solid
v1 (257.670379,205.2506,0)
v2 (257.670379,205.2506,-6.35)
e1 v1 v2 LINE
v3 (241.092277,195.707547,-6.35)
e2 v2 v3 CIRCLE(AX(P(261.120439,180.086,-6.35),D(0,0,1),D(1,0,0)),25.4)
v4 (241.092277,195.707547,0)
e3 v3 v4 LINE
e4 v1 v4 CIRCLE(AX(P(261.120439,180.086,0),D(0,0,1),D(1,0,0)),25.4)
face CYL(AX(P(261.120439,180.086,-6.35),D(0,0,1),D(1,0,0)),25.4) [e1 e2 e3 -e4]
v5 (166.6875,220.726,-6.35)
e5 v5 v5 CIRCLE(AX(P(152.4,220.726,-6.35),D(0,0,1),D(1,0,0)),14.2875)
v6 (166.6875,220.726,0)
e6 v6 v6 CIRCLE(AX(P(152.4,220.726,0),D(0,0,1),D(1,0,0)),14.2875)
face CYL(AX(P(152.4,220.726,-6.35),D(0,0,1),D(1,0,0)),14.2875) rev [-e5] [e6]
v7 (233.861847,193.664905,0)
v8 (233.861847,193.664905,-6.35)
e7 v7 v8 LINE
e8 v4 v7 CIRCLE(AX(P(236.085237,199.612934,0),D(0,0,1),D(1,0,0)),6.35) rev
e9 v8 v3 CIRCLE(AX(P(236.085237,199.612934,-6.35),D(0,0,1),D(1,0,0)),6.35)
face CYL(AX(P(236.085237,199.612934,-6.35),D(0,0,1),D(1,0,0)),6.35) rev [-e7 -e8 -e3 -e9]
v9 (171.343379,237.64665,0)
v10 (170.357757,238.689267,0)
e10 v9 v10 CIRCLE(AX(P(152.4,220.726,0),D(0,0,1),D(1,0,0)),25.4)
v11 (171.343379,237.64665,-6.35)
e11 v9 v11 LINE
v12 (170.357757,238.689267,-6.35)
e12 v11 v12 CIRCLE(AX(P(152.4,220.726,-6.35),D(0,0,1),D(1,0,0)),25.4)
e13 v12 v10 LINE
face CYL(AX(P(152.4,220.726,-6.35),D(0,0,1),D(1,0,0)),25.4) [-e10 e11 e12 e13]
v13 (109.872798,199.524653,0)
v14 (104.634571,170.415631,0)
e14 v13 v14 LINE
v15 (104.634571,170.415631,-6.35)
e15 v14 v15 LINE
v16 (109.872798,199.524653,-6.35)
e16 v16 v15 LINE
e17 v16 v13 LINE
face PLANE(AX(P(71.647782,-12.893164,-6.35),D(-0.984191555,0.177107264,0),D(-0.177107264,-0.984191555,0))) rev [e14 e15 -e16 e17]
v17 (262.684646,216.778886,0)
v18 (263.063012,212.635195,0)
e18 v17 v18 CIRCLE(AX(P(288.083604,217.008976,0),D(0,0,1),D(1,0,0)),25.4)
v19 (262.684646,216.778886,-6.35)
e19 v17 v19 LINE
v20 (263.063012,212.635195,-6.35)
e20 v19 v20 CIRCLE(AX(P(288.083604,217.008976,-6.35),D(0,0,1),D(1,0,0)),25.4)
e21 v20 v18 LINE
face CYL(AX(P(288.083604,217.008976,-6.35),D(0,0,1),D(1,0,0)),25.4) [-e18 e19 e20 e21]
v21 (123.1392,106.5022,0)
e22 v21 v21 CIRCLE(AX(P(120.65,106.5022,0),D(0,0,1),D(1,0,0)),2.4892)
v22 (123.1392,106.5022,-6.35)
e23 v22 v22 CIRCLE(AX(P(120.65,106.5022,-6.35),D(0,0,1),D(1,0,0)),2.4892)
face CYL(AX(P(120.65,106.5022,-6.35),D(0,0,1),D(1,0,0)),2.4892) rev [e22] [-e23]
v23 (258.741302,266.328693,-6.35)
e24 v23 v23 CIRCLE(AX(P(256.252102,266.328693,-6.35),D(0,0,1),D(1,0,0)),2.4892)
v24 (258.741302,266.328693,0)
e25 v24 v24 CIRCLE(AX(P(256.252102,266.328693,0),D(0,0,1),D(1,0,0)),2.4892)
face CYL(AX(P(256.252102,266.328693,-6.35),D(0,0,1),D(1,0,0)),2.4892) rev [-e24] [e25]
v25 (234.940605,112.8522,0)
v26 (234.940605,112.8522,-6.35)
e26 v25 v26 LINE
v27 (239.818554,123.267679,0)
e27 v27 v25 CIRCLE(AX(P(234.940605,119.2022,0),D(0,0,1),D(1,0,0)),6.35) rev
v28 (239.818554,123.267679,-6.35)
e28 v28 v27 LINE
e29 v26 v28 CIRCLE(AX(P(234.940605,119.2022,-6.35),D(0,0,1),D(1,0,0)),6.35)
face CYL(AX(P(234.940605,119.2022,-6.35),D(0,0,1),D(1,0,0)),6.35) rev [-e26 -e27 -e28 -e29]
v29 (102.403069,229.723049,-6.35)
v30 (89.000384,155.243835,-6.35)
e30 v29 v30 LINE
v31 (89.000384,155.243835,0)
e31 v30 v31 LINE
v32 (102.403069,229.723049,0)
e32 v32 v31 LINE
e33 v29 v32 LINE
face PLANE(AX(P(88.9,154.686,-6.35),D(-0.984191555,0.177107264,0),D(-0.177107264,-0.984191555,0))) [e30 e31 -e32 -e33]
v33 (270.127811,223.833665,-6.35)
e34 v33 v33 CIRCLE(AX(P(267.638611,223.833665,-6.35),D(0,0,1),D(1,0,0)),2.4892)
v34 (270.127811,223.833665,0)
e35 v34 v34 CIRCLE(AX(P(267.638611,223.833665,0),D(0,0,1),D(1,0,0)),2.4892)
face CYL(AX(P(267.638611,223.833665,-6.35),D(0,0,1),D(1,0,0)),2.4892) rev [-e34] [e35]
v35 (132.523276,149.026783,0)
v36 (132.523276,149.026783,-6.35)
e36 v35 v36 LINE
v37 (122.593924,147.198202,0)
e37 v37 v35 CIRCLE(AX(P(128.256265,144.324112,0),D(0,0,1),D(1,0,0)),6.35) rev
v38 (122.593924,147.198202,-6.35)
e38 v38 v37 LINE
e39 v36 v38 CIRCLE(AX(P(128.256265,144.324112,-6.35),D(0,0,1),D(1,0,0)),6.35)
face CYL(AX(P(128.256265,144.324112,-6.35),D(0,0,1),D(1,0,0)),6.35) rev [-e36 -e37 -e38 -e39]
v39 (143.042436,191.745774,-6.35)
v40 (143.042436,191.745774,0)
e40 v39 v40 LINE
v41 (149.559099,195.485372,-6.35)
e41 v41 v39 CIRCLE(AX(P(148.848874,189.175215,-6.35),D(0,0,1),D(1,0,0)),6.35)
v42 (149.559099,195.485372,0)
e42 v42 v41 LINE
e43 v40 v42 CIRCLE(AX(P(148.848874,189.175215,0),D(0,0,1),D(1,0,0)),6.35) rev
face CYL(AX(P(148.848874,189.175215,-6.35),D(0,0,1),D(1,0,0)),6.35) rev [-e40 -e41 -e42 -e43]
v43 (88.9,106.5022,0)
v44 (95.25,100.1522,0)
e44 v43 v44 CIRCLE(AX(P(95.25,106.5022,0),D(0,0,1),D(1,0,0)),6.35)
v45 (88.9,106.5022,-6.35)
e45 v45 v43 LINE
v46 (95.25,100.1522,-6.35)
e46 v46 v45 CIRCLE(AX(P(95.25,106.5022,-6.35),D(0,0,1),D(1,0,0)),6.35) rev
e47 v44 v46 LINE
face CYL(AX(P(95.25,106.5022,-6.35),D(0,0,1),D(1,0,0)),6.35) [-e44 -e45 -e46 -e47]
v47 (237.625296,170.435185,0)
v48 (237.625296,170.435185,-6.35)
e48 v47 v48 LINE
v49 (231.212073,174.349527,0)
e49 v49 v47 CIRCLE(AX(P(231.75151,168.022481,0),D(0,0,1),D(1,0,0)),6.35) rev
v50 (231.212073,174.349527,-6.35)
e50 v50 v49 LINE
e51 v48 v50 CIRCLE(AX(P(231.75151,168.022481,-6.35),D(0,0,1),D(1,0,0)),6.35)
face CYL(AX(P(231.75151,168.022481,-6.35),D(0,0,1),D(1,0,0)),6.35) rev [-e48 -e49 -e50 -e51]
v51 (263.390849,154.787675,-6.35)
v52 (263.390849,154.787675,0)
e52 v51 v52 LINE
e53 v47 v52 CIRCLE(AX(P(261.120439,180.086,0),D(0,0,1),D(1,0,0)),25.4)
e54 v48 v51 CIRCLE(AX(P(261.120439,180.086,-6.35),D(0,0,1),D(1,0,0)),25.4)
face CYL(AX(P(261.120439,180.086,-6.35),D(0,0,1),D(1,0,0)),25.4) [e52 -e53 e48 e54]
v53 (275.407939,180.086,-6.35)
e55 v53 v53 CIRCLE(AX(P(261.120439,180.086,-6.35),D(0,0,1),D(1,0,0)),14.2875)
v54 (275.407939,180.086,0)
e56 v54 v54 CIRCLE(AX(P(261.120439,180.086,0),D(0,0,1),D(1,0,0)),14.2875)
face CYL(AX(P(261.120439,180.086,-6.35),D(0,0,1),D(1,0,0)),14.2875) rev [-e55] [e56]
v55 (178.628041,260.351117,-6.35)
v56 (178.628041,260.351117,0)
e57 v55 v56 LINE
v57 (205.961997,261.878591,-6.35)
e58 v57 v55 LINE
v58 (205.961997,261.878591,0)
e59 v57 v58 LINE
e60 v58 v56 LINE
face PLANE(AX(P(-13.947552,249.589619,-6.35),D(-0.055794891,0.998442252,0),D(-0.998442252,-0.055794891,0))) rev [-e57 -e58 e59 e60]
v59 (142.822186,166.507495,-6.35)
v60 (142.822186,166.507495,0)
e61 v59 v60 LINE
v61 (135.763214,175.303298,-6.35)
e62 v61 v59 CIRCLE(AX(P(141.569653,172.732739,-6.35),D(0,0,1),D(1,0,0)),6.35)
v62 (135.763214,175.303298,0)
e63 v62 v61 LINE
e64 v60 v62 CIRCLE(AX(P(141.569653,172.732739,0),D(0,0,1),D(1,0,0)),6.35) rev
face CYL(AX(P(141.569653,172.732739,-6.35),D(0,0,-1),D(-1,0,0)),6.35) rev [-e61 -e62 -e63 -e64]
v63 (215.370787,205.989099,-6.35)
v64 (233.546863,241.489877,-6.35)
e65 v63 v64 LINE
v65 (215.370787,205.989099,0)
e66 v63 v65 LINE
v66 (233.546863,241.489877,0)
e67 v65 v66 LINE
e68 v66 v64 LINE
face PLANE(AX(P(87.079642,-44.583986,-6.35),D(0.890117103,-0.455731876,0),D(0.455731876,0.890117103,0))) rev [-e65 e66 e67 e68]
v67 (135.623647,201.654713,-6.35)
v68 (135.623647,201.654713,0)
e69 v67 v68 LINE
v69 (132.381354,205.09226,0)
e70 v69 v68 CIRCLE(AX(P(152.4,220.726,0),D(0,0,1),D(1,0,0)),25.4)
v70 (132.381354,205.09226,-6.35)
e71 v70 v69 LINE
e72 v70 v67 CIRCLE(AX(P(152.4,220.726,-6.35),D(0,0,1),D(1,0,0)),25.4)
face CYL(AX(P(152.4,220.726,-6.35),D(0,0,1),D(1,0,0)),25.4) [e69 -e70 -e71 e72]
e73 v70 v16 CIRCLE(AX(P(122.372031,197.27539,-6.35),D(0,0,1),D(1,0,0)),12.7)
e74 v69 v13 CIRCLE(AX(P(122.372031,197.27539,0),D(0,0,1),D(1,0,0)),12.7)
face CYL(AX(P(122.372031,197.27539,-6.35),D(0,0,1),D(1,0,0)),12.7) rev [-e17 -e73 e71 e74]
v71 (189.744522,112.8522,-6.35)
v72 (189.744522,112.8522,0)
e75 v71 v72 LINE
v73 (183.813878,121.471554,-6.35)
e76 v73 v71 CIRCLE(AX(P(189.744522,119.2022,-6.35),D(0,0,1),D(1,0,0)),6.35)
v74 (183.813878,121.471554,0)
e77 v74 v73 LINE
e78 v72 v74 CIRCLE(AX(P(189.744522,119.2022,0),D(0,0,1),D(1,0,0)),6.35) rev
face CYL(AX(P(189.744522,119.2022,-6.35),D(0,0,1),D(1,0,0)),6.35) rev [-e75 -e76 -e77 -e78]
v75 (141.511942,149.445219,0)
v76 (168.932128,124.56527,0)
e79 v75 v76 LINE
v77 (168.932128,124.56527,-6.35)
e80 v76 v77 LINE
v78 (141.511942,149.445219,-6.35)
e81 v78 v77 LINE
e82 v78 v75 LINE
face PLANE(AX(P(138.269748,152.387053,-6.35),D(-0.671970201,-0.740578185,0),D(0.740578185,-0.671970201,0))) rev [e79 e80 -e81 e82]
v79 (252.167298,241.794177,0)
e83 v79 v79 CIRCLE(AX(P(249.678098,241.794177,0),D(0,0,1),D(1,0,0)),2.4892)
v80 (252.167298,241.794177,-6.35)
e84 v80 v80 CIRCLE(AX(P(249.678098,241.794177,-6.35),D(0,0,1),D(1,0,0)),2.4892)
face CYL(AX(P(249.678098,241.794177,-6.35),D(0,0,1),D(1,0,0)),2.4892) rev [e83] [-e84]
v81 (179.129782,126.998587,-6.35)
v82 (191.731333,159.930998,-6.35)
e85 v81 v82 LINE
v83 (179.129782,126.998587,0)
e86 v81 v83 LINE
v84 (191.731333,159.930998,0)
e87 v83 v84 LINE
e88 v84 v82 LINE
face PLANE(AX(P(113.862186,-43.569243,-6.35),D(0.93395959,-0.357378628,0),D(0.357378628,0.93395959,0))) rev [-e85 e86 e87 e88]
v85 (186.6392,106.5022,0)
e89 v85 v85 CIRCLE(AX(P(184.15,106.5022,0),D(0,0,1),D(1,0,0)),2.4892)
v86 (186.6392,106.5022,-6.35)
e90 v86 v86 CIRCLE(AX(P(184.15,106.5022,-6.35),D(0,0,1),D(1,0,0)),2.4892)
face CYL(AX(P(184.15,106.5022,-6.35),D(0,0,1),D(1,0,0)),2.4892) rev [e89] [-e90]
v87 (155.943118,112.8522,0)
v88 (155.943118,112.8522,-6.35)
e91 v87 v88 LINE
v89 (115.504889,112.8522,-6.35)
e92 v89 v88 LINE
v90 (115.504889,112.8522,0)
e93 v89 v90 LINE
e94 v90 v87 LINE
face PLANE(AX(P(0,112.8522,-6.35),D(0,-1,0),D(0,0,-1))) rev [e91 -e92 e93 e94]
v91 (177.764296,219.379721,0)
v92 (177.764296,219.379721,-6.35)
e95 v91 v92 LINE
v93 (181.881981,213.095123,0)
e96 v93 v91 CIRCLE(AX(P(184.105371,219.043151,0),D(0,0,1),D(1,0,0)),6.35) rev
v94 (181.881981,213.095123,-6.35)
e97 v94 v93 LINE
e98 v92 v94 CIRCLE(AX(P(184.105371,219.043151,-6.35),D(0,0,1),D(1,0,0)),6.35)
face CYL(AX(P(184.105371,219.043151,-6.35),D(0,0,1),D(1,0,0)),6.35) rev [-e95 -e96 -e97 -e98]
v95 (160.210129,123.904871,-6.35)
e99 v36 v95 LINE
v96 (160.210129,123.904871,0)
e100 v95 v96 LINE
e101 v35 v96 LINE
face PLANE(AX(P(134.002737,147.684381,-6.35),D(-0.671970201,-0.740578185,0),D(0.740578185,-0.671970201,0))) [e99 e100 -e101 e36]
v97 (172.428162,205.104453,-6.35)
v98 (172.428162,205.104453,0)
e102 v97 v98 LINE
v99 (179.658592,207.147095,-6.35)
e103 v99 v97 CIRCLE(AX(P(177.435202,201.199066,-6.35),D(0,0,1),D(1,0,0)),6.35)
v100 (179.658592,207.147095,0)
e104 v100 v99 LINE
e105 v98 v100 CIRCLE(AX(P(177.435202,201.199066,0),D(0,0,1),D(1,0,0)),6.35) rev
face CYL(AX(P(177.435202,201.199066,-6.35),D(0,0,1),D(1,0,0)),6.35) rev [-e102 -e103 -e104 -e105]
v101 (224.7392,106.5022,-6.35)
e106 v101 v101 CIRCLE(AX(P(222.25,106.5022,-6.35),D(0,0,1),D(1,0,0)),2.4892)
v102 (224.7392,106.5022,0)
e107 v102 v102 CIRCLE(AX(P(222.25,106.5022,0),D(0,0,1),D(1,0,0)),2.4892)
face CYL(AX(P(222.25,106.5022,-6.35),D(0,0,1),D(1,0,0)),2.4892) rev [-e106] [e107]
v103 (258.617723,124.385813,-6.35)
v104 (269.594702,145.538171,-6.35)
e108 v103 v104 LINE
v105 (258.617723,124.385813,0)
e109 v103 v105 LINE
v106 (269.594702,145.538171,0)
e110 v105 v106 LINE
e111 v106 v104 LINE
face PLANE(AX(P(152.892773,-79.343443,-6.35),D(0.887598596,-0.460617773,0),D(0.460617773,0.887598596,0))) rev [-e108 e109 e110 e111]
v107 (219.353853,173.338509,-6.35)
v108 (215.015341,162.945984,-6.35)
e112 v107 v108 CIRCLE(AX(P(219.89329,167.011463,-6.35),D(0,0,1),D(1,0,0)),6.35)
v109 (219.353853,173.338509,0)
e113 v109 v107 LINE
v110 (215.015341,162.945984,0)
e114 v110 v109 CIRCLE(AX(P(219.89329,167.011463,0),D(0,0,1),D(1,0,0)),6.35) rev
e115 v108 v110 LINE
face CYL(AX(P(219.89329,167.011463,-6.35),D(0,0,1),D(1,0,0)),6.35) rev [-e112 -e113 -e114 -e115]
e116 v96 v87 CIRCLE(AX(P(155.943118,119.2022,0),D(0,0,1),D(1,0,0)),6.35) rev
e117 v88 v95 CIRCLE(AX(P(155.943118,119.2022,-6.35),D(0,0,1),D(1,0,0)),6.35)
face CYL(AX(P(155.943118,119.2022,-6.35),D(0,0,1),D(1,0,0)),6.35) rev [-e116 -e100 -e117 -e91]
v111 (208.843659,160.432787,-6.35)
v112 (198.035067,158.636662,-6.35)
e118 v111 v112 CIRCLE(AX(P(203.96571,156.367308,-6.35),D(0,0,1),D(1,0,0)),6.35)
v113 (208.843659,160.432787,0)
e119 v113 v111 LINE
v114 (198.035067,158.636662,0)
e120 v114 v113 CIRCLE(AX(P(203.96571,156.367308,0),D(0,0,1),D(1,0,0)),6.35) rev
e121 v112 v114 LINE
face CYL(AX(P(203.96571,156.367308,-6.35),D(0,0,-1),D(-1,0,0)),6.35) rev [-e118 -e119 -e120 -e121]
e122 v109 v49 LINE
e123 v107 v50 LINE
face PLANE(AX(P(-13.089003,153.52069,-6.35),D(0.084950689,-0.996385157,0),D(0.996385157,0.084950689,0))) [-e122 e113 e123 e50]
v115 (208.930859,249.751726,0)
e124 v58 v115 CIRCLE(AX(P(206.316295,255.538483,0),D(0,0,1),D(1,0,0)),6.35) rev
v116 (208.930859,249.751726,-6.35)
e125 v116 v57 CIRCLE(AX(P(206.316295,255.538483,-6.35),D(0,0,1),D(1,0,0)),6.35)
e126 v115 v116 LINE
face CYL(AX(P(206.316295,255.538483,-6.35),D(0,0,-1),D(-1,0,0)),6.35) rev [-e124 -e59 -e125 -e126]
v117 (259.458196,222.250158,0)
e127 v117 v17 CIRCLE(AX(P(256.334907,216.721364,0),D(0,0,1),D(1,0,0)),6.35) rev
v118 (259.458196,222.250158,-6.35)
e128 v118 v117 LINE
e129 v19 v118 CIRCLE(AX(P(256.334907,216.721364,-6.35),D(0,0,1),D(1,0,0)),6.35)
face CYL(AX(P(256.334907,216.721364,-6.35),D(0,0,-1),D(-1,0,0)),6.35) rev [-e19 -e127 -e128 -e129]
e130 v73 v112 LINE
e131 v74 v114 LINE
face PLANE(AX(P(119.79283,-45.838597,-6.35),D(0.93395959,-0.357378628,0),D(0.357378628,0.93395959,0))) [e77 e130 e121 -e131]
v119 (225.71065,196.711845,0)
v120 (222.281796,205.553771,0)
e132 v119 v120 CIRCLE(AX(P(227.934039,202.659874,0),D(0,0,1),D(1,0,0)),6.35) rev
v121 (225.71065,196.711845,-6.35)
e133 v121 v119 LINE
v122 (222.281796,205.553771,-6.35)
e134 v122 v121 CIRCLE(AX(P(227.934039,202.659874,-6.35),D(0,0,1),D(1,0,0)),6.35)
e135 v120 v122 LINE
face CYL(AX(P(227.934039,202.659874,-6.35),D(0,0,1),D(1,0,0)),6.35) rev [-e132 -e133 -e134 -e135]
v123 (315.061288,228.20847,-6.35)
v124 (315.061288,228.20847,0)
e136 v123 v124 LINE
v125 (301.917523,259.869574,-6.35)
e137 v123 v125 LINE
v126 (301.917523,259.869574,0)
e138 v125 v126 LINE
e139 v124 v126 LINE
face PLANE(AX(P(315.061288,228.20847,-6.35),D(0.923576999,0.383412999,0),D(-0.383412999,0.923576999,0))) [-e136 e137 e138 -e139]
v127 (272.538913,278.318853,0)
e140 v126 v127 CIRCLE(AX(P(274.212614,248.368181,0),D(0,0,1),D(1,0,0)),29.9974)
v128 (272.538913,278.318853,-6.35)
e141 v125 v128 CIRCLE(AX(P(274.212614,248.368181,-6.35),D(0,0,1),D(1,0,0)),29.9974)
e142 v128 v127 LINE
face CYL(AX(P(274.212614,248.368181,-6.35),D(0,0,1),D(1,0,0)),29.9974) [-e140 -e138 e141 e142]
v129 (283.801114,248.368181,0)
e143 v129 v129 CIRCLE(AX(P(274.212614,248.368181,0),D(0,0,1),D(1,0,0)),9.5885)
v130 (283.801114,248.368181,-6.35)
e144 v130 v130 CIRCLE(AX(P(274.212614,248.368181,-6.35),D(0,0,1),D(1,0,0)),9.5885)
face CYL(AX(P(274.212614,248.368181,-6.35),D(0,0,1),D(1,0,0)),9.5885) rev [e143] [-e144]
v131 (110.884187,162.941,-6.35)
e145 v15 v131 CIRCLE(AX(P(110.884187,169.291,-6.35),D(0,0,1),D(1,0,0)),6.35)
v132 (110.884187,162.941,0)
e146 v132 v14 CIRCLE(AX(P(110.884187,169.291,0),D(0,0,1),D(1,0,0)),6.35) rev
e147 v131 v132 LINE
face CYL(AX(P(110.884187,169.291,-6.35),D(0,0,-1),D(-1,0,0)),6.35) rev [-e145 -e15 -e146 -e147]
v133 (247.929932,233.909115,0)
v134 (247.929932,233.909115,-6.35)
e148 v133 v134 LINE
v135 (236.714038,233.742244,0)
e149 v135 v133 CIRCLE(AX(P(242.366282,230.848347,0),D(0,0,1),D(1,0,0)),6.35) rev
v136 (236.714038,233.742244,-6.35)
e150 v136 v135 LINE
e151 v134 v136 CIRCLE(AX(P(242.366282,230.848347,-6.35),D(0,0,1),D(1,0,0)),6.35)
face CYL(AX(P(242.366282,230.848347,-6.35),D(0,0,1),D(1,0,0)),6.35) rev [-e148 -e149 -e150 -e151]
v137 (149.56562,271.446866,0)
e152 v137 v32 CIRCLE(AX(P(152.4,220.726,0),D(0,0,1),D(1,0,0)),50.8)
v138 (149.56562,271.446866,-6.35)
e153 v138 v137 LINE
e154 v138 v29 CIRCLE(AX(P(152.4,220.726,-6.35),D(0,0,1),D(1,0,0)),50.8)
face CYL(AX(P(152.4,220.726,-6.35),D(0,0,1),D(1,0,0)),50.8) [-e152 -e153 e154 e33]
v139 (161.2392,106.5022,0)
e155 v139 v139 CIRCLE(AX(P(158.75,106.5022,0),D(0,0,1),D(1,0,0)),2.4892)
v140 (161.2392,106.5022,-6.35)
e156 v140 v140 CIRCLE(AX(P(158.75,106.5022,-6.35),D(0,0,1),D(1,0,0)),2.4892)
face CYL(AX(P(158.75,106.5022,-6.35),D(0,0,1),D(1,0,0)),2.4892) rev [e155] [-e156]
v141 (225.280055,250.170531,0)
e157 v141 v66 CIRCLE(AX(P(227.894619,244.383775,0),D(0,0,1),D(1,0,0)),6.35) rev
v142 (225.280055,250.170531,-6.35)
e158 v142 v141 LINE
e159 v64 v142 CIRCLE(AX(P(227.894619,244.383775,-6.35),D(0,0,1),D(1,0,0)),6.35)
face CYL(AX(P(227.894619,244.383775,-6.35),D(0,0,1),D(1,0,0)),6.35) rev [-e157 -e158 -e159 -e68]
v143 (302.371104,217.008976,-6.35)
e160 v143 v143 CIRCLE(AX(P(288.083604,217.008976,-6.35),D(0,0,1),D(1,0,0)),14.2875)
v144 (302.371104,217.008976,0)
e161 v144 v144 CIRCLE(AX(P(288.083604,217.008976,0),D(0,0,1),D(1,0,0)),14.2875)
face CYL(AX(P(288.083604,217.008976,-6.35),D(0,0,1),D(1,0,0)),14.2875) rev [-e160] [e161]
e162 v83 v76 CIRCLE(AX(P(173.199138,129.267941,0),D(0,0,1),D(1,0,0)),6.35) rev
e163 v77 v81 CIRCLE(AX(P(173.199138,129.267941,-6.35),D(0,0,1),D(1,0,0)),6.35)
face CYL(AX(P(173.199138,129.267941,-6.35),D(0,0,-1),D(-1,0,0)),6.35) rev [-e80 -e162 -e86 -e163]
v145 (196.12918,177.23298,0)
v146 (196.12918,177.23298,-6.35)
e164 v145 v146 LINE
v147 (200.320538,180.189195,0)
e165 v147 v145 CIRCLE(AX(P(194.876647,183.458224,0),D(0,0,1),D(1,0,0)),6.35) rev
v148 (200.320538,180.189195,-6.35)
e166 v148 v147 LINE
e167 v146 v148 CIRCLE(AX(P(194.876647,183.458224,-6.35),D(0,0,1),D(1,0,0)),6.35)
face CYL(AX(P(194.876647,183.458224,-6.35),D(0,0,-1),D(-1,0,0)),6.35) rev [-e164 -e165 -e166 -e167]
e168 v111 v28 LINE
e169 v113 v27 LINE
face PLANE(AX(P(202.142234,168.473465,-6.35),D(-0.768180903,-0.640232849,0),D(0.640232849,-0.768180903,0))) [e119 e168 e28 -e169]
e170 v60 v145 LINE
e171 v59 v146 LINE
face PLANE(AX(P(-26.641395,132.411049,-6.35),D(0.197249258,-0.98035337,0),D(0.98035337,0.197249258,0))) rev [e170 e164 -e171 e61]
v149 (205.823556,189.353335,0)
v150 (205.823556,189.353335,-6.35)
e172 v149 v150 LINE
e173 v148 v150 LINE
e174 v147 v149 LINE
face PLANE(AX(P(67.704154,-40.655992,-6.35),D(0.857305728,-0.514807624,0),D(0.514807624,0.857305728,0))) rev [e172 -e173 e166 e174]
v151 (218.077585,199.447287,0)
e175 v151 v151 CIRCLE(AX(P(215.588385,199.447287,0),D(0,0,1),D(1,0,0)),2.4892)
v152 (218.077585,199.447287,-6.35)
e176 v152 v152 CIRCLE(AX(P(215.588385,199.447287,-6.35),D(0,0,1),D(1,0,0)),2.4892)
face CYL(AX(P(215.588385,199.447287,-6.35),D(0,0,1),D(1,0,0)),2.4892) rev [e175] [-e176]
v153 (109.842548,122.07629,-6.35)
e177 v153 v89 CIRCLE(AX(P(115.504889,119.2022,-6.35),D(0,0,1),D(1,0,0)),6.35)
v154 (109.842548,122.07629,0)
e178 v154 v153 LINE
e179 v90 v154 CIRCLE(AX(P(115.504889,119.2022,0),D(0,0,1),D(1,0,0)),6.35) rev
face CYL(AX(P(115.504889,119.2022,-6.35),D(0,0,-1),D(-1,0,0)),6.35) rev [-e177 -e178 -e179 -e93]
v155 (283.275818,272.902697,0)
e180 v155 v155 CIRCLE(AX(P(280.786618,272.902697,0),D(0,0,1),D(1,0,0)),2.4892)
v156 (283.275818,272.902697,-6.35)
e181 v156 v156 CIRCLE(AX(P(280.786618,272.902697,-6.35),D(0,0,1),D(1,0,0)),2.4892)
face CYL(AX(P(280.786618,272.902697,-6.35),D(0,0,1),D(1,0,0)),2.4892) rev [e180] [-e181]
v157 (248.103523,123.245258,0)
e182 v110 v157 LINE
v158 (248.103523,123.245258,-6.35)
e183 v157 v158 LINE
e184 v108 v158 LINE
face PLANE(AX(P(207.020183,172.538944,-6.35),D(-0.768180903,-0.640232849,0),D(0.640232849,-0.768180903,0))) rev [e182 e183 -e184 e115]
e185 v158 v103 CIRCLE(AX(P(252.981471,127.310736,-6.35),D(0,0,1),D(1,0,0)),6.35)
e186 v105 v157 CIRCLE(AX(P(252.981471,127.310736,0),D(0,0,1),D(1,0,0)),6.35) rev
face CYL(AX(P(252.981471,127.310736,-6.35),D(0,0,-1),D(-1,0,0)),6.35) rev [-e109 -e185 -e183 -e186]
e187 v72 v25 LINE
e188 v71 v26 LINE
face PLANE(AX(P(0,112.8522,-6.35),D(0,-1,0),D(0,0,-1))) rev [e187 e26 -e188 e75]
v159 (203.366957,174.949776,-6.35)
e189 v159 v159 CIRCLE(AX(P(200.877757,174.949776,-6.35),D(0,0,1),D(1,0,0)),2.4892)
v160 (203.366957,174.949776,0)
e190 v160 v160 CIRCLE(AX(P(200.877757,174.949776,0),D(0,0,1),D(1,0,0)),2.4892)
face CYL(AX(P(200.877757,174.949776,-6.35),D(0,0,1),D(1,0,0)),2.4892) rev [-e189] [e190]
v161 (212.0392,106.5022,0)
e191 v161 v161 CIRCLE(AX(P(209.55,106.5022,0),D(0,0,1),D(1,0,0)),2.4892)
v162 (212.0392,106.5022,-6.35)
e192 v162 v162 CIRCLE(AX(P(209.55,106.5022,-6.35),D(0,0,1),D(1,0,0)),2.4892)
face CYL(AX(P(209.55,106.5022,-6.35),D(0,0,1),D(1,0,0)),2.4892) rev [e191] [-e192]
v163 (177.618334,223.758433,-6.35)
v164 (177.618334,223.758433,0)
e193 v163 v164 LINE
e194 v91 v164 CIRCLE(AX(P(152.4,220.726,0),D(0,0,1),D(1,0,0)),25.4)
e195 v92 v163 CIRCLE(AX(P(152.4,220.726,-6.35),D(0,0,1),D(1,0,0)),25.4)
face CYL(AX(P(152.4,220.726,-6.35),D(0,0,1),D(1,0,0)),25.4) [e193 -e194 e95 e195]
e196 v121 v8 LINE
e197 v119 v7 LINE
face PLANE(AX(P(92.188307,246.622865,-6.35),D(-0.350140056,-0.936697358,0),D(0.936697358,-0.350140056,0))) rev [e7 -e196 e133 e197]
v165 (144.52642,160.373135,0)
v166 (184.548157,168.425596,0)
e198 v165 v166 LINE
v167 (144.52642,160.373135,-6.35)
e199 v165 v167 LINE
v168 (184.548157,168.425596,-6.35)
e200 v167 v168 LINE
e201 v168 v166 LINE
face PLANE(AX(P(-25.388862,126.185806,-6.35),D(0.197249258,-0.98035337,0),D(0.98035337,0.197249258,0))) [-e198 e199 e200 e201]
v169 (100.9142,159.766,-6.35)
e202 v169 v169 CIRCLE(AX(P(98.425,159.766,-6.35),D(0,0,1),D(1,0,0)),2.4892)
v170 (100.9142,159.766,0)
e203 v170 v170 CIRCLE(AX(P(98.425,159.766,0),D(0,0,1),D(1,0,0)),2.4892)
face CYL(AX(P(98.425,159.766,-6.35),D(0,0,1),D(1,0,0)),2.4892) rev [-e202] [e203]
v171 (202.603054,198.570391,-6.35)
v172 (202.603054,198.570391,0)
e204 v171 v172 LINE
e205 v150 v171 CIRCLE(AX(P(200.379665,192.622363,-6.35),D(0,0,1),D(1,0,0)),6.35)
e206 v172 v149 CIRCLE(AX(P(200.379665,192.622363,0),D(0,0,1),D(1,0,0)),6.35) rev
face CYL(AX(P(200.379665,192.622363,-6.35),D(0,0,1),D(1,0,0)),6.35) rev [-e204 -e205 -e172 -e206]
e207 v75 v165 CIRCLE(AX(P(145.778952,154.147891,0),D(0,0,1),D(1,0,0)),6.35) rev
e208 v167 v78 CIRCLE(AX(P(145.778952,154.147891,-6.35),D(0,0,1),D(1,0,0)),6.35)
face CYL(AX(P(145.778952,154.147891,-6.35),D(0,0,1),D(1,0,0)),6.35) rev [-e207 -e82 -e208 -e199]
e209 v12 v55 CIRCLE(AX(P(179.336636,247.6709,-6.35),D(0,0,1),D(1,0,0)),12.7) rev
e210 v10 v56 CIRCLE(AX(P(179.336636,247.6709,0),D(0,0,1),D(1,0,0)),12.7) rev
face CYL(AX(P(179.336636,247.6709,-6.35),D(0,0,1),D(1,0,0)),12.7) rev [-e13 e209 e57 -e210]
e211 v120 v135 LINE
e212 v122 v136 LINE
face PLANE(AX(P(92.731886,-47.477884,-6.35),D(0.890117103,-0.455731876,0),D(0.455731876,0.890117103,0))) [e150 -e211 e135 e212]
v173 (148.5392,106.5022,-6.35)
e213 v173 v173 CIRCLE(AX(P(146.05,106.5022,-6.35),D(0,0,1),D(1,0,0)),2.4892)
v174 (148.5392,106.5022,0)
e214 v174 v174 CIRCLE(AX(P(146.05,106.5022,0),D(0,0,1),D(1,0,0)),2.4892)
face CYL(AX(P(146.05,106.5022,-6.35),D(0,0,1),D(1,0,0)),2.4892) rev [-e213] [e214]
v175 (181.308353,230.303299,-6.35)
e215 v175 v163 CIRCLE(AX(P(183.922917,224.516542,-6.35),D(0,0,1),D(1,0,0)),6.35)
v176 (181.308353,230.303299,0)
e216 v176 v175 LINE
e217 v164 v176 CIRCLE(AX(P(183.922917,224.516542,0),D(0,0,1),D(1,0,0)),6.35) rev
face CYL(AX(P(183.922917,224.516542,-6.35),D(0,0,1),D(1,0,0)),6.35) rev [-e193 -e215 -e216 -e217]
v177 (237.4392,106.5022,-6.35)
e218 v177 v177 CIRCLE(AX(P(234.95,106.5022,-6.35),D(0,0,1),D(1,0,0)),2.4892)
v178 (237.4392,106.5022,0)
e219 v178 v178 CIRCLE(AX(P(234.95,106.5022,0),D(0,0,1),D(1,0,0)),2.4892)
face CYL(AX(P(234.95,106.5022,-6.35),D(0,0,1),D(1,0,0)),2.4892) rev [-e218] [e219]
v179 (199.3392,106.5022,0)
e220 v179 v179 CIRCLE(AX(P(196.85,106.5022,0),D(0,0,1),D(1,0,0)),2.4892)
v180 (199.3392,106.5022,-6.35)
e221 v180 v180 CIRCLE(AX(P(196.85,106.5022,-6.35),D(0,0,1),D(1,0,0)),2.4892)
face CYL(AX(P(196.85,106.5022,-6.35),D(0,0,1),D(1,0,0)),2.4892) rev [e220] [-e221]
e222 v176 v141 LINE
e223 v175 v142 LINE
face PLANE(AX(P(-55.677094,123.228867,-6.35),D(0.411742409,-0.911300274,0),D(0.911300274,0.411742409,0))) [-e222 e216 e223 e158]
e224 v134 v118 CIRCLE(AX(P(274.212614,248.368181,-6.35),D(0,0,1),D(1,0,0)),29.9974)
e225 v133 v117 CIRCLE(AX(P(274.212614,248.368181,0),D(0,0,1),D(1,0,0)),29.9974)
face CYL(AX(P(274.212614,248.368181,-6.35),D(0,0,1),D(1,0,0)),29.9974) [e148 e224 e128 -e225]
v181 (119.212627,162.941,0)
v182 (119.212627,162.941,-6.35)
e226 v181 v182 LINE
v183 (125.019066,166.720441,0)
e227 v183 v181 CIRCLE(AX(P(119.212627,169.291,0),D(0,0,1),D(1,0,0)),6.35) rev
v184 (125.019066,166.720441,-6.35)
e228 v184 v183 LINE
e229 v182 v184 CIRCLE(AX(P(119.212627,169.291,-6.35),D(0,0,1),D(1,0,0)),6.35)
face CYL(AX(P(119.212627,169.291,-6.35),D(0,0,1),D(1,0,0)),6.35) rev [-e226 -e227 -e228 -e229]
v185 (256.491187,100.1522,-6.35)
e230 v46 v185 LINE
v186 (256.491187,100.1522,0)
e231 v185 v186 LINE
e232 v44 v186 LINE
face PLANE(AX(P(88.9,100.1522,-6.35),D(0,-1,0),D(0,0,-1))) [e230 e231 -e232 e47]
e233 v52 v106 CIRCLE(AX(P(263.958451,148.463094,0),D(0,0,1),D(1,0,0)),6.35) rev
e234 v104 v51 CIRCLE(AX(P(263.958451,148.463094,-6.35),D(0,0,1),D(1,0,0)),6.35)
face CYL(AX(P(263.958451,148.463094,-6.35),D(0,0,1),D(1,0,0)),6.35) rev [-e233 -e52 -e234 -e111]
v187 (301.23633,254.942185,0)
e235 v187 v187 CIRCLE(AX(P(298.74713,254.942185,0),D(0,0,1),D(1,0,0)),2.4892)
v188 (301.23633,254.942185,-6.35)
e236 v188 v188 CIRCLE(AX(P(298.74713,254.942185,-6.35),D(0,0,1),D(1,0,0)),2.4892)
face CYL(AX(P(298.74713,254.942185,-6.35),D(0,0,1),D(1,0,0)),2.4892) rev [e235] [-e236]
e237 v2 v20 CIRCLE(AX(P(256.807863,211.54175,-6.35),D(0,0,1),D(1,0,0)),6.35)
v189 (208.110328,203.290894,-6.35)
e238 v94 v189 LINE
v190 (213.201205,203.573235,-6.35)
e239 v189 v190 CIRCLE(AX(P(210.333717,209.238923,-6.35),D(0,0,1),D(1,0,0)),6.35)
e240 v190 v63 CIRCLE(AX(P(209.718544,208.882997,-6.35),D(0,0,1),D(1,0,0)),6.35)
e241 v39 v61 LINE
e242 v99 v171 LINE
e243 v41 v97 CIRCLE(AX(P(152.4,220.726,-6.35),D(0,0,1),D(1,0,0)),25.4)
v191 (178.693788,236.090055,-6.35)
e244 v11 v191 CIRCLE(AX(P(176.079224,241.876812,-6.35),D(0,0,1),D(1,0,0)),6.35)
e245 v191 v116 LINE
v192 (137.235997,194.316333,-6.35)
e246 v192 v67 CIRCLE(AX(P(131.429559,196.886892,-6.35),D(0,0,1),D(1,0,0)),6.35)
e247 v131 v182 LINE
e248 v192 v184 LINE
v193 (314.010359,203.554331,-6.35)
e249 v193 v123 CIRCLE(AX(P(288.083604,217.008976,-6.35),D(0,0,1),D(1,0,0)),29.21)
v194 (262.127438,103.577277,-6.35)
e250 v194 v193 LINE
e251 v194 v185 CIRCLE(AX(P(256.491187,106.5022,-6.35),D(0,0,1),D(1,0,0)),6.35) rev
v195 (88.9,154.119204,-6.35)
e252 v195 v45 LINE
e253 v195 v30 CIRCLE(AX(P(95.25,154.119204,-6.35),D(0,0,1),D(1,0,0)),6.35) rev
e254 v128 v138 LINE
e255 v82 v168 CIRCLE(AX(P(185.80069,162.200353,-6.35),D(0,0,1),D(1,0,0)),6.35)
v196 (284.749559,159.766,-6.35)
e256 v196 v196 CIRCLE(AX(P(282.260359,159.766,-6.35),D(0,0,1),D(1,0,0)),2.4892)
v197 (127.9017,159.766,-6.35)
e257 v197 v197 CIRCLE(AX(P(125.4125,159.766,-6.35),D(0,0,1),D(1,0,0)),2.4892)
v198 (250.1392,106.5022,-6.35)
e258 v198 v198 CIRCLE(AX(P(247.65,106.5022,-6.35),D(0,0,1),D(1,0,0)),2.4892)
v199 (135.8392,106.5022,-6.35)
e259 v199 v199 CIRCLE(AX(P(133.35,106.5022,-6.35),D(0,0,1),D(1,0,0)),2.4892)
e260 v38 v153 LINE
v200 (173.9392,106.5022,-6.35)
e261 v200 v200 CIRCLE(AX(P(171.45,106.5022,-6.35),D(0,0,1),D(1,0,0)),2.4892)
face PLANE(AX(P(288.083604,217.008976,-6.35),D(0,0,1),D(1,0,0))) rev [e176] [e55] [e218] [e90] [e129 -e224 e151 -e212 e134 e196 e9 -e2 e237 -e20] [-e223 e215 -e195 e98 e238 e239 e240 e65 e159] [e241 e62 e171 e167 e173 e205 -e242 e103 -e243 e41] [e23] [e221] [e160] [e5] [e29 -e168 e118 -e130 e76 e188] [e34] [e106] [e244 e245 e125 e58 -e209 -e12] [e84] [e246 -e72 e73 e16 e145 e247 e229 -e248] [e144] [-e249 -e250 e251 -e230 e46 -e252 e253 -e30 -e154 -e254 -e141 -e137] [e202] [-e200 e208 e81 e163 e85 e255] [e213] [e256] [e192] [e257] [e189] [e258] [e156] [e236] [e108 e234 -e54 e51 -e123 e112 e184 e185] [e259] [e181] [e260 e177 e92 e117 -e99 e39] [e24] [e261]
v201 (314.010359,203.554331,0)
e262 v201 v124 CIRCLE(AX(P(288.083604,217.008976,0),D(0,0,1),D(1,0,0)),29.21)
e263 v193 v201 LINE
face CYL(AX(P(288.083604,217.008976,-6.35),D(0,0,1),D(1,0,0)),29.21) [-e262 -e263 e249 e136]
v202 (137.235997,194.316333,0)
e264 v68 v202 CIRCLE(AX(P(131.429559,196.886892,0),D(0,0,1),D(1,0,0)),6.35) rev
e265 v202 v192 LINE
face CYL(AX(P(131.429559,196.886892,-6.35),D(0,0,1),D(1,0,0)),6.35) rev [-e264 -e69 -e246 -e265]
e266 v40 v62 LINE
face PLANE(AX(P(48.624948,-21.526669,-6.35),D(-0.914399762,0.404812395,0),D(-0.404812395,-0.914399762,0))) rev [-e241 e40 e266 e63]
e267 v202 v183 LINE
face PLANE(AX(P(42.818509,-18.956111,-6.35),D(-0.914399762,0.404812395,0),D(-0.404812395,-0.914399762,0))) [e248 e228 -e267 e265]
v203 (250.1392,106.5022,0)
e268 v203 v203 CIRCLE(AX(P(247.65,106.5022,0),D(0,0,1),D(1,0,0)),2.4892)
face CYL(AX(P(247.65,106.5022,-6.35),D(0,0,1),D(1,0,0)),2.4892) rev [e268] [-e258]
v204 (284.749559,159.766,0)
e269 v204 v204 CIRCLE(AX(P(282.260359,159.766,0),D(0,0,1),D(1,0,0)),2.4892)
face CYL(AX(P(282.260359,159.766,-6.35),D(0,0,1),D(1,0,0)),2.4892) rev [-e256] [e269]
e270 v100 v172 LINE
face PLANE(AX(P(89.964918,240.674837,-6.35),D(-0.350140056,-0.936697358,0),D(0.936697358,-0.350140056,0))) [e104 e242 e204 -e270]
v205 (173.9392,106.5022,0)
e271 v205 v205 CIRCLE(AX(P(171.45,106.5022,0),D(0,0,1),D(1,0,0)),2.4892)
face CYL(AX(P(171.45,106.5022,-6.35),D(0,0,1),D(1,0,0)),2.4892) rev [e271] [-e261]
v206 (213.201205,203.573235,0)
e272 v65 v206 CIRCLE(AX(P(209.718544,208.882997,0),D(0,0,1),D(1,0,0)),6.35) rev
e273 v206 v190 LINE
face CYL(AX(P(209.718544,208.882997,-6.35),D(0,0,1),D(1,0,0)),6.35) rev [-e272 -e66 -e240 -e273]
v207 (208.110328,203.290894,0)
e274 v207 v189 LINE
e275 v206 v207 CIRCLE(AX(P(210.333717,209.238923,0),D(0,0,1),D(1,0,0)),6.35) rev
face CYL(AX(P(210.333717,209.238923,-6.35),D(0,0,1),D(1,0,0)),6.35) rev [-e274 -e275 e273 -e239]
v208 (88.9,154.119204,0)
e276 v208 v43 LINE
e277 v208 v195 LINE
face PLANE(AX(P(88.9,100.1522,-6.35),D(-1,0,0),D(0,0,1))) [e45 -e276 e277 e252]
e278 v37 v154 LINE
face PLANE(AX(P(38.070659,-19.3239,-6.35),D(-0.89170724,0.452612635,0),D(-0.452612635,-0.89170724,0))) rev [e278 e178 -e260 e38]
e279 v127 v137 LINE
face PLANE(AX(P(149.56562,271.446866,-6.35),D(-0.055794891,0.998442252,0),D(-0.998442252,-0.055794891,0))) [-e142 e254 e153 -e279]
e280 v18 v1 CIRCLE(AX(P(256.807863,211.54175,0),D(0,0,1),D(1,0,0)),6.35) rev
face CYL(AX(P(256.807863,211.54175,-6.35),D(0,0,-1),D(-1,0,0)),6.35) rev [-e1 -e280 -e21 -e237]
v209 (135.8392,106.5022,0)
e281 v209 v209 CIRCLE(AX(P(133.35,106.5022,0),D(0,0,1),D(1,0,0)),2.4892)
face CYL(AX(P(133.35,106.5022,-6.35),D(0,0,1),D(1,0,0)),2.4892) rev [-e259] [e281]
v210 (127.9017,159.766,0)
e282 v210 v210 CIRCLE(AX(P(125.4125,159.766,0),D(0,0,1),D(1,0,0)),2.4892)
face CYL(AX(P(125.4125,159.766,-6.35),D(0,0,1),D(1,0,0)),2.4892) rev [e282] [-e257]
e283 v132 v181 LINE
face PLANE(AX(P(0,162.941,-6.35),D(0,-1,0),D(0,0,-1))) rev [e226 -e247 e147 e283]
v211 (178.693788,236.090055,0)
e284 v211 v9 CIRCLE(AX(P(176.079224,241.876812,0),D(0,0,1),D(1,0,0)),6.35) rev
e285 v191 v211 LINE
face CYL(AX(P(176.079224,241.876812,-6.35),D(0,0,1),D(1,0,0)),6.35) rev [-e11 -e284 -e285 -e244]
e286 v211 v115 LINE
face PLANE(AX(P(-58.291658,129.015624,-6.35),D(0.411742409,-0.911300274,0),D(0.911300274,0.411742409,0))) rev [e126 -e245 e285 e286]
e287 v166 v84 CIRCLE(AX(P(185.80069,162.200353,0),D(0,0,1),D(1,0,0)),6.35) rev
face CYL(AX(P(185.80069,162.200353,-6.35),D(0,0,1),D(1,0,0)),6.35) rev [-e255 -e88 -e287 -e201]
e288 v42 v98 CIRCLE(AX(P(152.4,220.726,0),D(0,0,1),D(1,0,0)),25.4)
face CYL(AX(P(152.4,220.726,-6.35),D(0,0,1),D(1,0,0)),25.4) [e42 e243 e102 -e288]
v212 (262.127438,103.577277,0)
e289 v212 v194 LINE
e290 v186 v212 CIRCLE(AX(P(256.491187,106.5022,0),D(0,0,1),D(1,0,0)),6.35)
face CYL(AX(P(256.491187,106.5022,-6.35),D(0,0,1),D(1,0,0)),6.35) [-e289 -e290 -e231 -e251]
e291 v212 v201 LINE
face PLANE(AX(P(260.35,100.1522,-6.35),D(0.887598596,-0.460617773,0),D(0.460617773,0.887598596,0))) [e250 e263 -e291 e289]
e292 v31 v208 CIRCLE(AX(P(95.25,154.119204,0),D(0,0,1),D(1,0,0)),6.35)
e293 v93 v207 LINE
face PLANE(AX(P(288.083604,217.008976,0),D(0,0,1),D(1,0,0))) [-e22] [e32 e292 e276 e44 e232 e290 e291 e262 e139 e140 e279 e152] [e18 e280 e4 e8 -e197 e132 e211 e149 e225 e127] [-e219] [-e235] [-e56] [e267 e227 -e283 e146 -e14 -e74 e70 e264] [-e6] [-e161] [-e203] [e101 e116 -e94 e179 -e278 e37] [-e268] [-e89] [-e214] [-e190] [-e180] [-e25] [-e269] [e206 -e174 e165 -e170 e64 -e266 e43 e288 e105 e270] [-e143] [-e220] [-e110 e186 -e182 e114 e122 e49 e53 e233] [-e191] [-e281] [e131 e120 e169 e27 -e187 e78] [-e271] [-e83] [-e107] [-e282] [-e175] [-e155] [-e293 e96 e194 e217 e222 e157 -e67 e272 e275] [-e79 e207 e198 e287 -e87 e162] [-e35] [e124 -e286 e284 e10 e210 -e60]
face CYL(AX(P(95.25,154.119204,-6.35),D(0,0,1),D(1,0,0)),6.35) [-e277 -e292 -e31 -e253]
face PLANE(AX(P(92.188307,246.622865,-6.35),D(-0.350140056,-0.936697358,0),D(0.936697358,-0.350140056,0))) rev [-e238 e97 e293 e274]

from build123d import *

# Parameters (mm, degrees)
BOSS_EXTRUDE1_DEPTH = 6.35
SKETCH8_R           = 2.4892
SKETCH8_R_2         = 9.5885
SKETCH8_R_3         = 14.2875
CUT_EXTRUDE1_DEPTH  = 423.140912796
FILLET2_R           = 6.35
CUT_EXTRUDE2_DEPTH  = 423.140912796
FILLET4_R           = 6.35


with BuildPart() as part:
    # Sketch6 → Boss-Extrude1 (new body)
    with BuildSketch(Plane.XY):
        with BuildLine():
            Line((88.9, 100.1522), (88.9, 154.686))
            Line((88.9, 154.686), (102.403069007, 229.723049032))
            ThreePointArc((102.403069007, 229.723049032), (118.739844017, 258.773784419), (149.565619556, 271.446866391))
            Line((149.565619556, 271.446866391), (272.538912647, 278.318852655))
            ThreePointArc((272.538912647, 278.318852655), (290.165667423, 273.771804863), (301.917522958, 259.869574141))
            Line((301.917522958, 259.869574141), (315.061287977, 228.208469575))
            ThreePointArc((315.061287977, 228.208469575), (317.267101924, 215.764974261), (314.010358834, 203.554330738))
            Line((314.010358834, 203.554330738), (260.35, 100.1522))
            Line((260.35, 100.1522), (88.9, 100.1522))
        make_face()
    extrude(amount=-BOSS_EXTRUDE1_DEPTH)

    # Sketch8 → Cut-Extrude1 (cut, through all)
    with BuildSketch(Plane.XY):
        with Locations((249.678098312, 241.794177305)):
            Circle(SKETCH8_R)
        with Locations((256.252102058, 266.328693293)):
            Circle(SKETCH8_R)
        with Locations((298.747130287, 254.942184796)):
            Circle(SKETCH8_R)
        with Locations((274.2126143, 248.368181051)):
            Circle(SKETCH8_R_2)
        with Locations((261.120439119, 180.086)):
            Circle(SKETCH8_R_3)
        with Locations((152.4, 220.726)):
            Circle(SKETCH8_R_3)
        with Locations((215.588385064, 199.44728721)):
            Circle(SKETCH8_R)
        with Locations((200.87775722, 174.949776042)):
            Circle(SKETCH8_R)
        with Locations((247.65, 106.5022)):
            Circle(SKETCH8_R)
        with Locations((234.95, 106.5022)):
            Circle(SKETCH8_R)
        with Locations((222.25, 106.5022)):
            Circle(SKETCH8_R)
        with Locations((209.55, 106.5022)):
            Circle(SKETCH8_R)
        with Locations((196.85, 106.5022)):
            Circle(SKETCH8_R)
        with Locations((184.15, 106.5022)):
            Circle(SKETCH8_R)
        with Locations((171.45, 106.5022)):
            Circle(SKETCH8_R)
        with Locations((158.75, 106.5022)):
            Circle(SKETCH8_R)
        with Locations((146.05, 106.5022)):
            Circle(SKETCH8_R)
        with Locations((133.35, 106.5022)):
            Circle(SKETCH8_R)
        with Locations((120.65, 106.5022)):
            Circle(SKETCH8_R)
        with Locations((98.425, 159.766)):
            Circle(SKETCH8_R)
        with Locations((125.4125, 159.766)):
            Circle(SKETCH8_R)
        with Locations((267.638610554, 223.833665063)):
            Circle(SKETCH8_R)
        with Locations((280.786618045, 272.902697038)):
            Circle(SKETCH8_R)
        with Locations((288.083603848, 217.00897588)):
            Circle(SKETCH8_R_3)
        with Locations((282.260358834, 159.766)):
            Circle(SKETCH8_R)
    extrude(amount=-CUT_EXTRUDE1_DEPTH, mode=Mode.SUBTRACT)

    # Fillet2
    fillet2_edges = [part.edges().sort_by_distance(p)[0] for p in [
        (88.9, 100.1522, -3.175),
        (88.9, 154.686, -3.175),
        (260.35, 100.1522, -3.175),
    ]]
    fillet(fillet2_edges, radius=FILLET2_R)

    # Sketch10 → Cut-Extrude2 (cut, through all)
    with BuildSketch(Plane.XY):
        with BuildLine():
            ThreePointArc((132.38135413, 205.092260283), (119.322526921, 209.603834109), (109.872798447, 199.524652682))
            Line((109.872798447, 199.524652682), (103.289496024, 162.941))
            Line((103.289496024, 162.941), (123.345875833, 162.941))
            Line((123.345875833, 162.941), (139.295192153, 198.967690982))
            ThreePointArc((139.295192153, 198.967690982), (135.557542228, 201.713067133), (132.38135413, 205.092260283))
        make_face()
        with BuildLine():
            Line((239.978176313, 263.779481252), (178.628040949, 260.35111663))
            ThreePointArc((178.628040949, 260.35111663), (167.47195221, 252.200720904), (170.357757373, 238.689266688))
            ThreePointArc((170.357757373, 238.689266688), (172.346517501, 236.451661817), (174.058196694, 233.995608734))
            Line((174.058196694, 233.995608734), (239.978176313, 263.779481252))
        make_face()
        with BuildLine():
            ThreePointArc((174.893810536, 208.928182933), (162.247952366, 197.312802136), (145.101630643, 196.397132276))
            Line((145.101630643, 196.397132276), (130.798217617, 164.08824638))
            Line((130.798217617, 164.08824638), (198.877387124, 177.785925299))
            Line((198.877387124, 177.785925299), (209.75334836, 195.89759155))
            Line((209.75334836, 195.89759155), (174.893810536, 208.928182933))
        make_face()
        with BuildLine():
            Line((241.81663743, 257.642066667), (176.672760989, 228.208851995))
            ThreePointArc((176.672760989, 228.208851995), (177.785899525, 221.572230052), (177.117199892, 214.876211158))
            Line((177.117199892, 214.876211158), (211.56702527, 201.998771417))
            ThreePointArc((211.56702527, 201.998771417), (212.778851211, 203.29279443), (214.380001095, 204.053936148))
            Line((214.380001095, 204.053936148), (241.81663743, 257.642066667))
        make_face()
        with BuildLine():
            ThreePointArc((262.934686924, 220.57155606), (249.32436933, 231.622457146), (244.215224783, 248.393259208))
            Line((244.215224783, 248.393259208), (219.032834611, 199.208031295))
            Line((219.032834611, 199.208031295), (238.626628583, 191.883817067))
            ThreePointArc((238.626628583, 191.883817067), (249.98056388, 202.912808355), (265.660714786, 205.076916287))
            ThreePointArc((265.660714786, 205.076916287), (263.067805907, 212.607856319), (262.934686924, 220.57155606))
        make_face()
        Polygon((172.391274942, 112.8522), (126.360421812, 154.618703891), (105.160585646, 112.8522), align=None)
        Polygon((195.852068159, 170.6999682), (132.201317489, 157.89329691), (175.810504033, 118.324113728), align=None)
        Polygon((201.907074815, 168.755620076), (180.515691522, 112.8522), (248.49923266, 112.8522), align=None)
        with BuildLine():
            ThreePointArc((277.409295847, 160.596691482), (252.8389143, 156.07399578), (236.280473193, 174.781653407))
            Line((236.280473193, 174.781653407), (207.216268027, 172.303671647))
            Line((207.216268027, 172.303671647), (254.218372429, 115.908378783))
            Line((254.218372429, 115.908378783), (277.409295847, 160.596691482))
        make_face()
    extrude(amount=-CUT_EXTRUDE2_DEPTH, mode=Mode.SUBTRACT)

    # Fillet4
    # the kernel refuses this fillet: 6.35 mm, written as the material it adds along each edge
    with BuildSketch(Plane(origin=(248.49923266, 112.8522, 0), x_dir=(-1, 0, 0), z_dir=(0, 0, -1))) as fillet4_piece_1:
        with BuildLine():
            CenterArc((FILLET4_R * 2.13521690322, FILLET4_R), FILLET4_R, 140.190815375, 129.809184625)
            Line((FILLET4_R * 1.36703600033, FILLET4_R * 1.6402328486), (0, 0))
            Line((0, 0), (FILLET4_R * 2.13521690322, 0))
        make_face()
    extrude(amount=6.35)
    with BuildSketch(Plane(origin=(180.515691522, 112.8522, 0), x_dir=(1, 0, 0), z_dir=(0, 0, -1))) as fillet4_piece_2:
        with BuildLine():
            CenterArc((FILLET4_R * 1.45335905573, -FILLET4_R), FILLET4_R, 90, 110.939295612)
            Line((FILLET4_R * 0.519399465515, -FILLET4_R * 1.35737862813), (0, 0))
            Line((0, 0), (FILLET4_R * 1.45335905573, 0))
        make_face()
    extrude(amount=6.35)
    with BuildSketch(Plane(origin=(201.907074815, 168.755620076, 0), x_dir=(-0.357378628128185, -0.9339595902164164, 0), z_dir=(0, 0, -1))) as fillet4_piece_3:
        with BuildLine():
            CenterArc((FILLET4_R * 1.70621582933, -FILLET4_R), FILLET4_R, 90, 119.251519763)
            Line((FILLET4_R * 0.83373278318, -FILLET4_R * 1.48864438417), (0, 0))
            Line((0, 0), (FILLET4_R * 1.70621582933, 0))
        make_face()
    extrude(amount=6.35)
    with BuildSketch(Plane(origin=(174.893810536, 208.928182933, 0), x_dir=(0.9366973583653521, -0.3501400560224029, 0), z_dir=(0, 0, -1)), Plane(origin=(139.295192153, 198.967690982, 0), x_dir=(-0.4048123947171637, -0.9143997621846558, 0), z_dir=(0, 0, -1))) as fillet4_piece_4:
        with BuildLine():
            CenterArc((5.086788407, 6.35), FILLET4_R, 197.457603124, 72.542396876)
            ThreePointArc((-0.970725522, 4.445), (-0.385636331, 2.244278851), (0, 0))
            Line((0, 0), (5.086788407, 0))
        make_face()
    extrude(amount=6.35)
    with BuildSketch(Plane(origin=(209.75334836, 195.89759155, 0), x_dir=(-0.93669735836535, 0.3501400560224082, 0), z_dir=(0, 0, -1))) as fillet4_piece_5:
        with BuildLine():
            CenterArc((FILLET4_R * 1.20212849433, -FILLET4_R), FILLET4_R, 90, 100.488715343)
            Line((FILLET4_R * 0.218837713742, -FILLET4_R * 1.18204186555), (0, 0))
            Line((0, 0), (FILLET4_R * 1.20212849433, 0))
        make_face()
    extrude(amount=6.35)
    with BuildSketch(Plane(origin=(198.877387124, 177.785925299, 0), x_dir=(0.5148076235760114, 0.8573057276771336, 0), z_dir=(0, 0, -1))) as fillet4_piece_6:
        with BuildLine():
            CenterArc((FILLET4_R * 0.441461803934, -FILLET4_R), FILLET4_R, 90, 47.639253807)
            Line((-FILLET4_R * 0.297455333429, -FILLET4_R * 0.326203692418), (0, 0))
            Line((0, 0), (FILLET4_R * 0.441461803934, 0))
        make_face()
    extrude(amount=6.35)
    with BuildSketch(Plane(origin=(130.798217617, 164.08824638, 0), x_dir=(0.9803533700206324, 0.19724925827284906, 0), z_dir=(0, 0, -1))) as fillet4_piece_7:
        with BuildLine():
            CenterArc((FILLET4_R * 1.93148545136, -FILLET4_R), FILLET4_R, 90, 125.255520411)
            Line((FILLET4_R * 1.11489950755, -FILLET4_R * 1.57722387024), (0, 0))
            Line((0, 0), (FILLET4_R * 1.93148545136, 0))
        make_face()
    extrude(amount=6.35)
    with BuildSketch(Plane(origin=(145.101630643, 196.397132276, 0), x_dir=(-0.40481239471715436, -0.9143997621846599, 0), z_dir=(0, 0, -1)), Plane(origin=(177.117199892, 214.876211158, 0), x_dir=(0.9366973583653604, -0.35014005602238013, 0), z_dir=(0, 0, -1)), Plane(origin=(236.280473193, 174.781653407, 0), x_dir=(-0.9963851567026929, -0.08495068865259449, 0), z_dir=(0, 0, -1))) as fillet4_piece_8:
        with BuildLine():
            CenterArc((5.086788407, -6.35), FILLET4_R, 90, 72.542396876)
            ThreePointArc((-0.970725522, -4.445), (-0.385636331, -2.244278851), (0, 0))
            Line((0, 0), (5.086788407, 0))
        make_face()
    extrude(amount=6.35)
    with BuildSketch(Plane(origin=(239.978176313, 263.779481252, 0), x_dir=(-0.9984422517997382, -0.05579489063586382, 0), z_dir=(0, 0, -1))) as fillet4_piece_9:
        with BuildLine():
            CenterArc((FILLET4_R * 5.36523624806, -FILLET4_R), FILLET4_R, 90, 158.884135456)
            Line((FILLET4_R * 5.00498112961, -FILLET4_R * 1.93285382007), (0, 0))
            Line((0, 0), (FILLET4_R * 5.36523624806, 0))
        make_face()
    extrude(amount=6.35)
    with BuildSketch(Plane(origin=(174.058196694, 233.995608734, 0), x_dir=(-0.5966944028681971, 0.8024685598736973, 0), z_dir=(0, 0, -1))) as fillet4_piece_10:
        with BuildLine():
            CenterArc((5.118482099, 6.324480793), FILLET4_R, 192.319179453, 72.542396876)
            Line((-1.085304127, 4.96966108), (0, 0))
            ThreePointArc((0, 0), (2.274880933, 0.10207683), (4.549761866, 0))
        make_face()
    extrude(amount=6.35)
    with BuildSketch(Plane(origin=(176.672760989, 228.208851995, 0), x_dir=(0.2078290249018196, -0.9781651682657478, 0), z_dir=(0, 0, -1)), Plane(origin=(238.626628583, 191.883817067, 0), x_dir=(0.541929150053695, 0.8404241764264517, 0), z_dir=(0, 0, -1))) as fillet4_piece_11:
        with BuildLine():
            CenterArc((5.118482099, -6.324480793), FILLET4_R, 95.138423671, 72.542396876)
            Line((-1.085304127, -4.96966108), (0, 0))
            ThreePointArc((0, 0), (2.274880933, -0.10207683), (4.549761866, 0))
        make_face()
    extrude(amount=6.35)
    with BuildSketch(Plane(origin=(172.391274942, 112.8522, 0), x_dir=(-1, 0, 0), z_dir=(0, 0, -1))) as fillet4_piece_12:
        with BuildLine():
            CenterArc((FILLET4_R * 2.5902609689, FILLET4_R), FILLET4_R, 132.219308612, 137.780691388)
            Line((FILLET4_R * 1.91829076742, FILLET4_R * 1.74057818515), (0, 0))
            Line((0, 0), (FILLET4_R * 2.5902609689, 0))
        make_face()
    extrude(amount=6.35)
    with BuildSketch(Plane(origin=(105.160585646, 112.8522, 0), x_dir=(1, 0, 0), z_dir=(0, 0, -1))) as fillet4_piece_13:
        with BuildLine():
            CenterArc((FILLET4_R * 1.62902415722, -FILLET4_R), FILLET4_R, 90, 116.911431892)
            Line((FILLET4_R * 0.737316917022, -FILLET4_R * 1.45261263546), (0, 0))
            Line((0, 0), (FILLET4_R * 1.62902415722, 0))
        make_face()
    extrude(amount=6.35)
    with BuildSketch(Plane(origin=(126.360421812, 154.618703891, 0), x_dir=(-0.45261263545622027, -0.8917072402001538, 0), z_dir=(0, 0, -1))) as fillet4_piece_14:
        with BuildLine():
            CenterArc((FILLET4_R * 1.3105007302, -FILLET4_R), FILLET4_R, 90, 105.30787672)
            Line((FILLET4_R * 0.345979596726, -FILLET4_R * 1.26400564971), (0, 0))
            Line((0, 0), (FILLET4_R * 1.3105007302, 0))
        make_face()
    extrude(amount=6.35)
    with BuildSketch(Plane(origin=(265.660714786, 205.076916287, 0), x_dir=(-0.32502885090145955, 0.9457041007004657, 0), z_dir=(0, 0, -1))) as fillet4_piece_15:
        with BuildLine():
            CenterArc((8.991251597, -6.270920438), FILLET4_R, 99.0517934, 92.108960875)
            ThreePointArc((2.761342992, -7.500041575), (1.677510036, -3.640731657), (0, 0))
            ThreePointArc((0, 0), (3.996111821, -0.316318246), (7.992223642, 0))
        make_face()
    extrude(amount=6.35)
    with BuildSketch(Plane(origin=(219.032834611, 199.208031295, 0), x_dir=(0.9366973583653502, -0.3501400560224078, 0), z_dir=(0, 0, -1))) as fillet4_piece_16:
        with BuildLine():
            CenterArc((FILLET4_R * 1.12269397046, -FILLET4_R), FILLET4_R, 90, 96.616152506)
            Line((FILLET4_R * 0.129353646771, -FILLET4_R * 1.11521719202), (0, 0))
            Line((0, 0), (FILLET4_R * 1.12269397046, 0))
        make_face()
    extrude(amount=6.35)
    with BuildSketch(Plane(origin=(244.215224783, 248.393259208, 0), x_dir=(-0.45573187598644843, -0.8901171030880557, 0), z_dir=(0, 0, -1))) as fillet4_piece_17:
        with BuildLine():
            CenterArc((16.459648826, -6.35), FILLET4_R, 90, 124.071161903)
            ThreePointArc((11.19967452, -9.907410617), (6.227056688, -4.244675096), (0, 0))
            Line((0, 0), (16.459648826, 0))
        make_face()
    extrude(amount=6.35)
    with BuildSketch(Plane(origin=(262.934686924, 220.57155606, 0), x_dir=(-0.06578459951306488, -0.9978338471243124, 0), z_dir=(0, 0, -1))) as fillet4_piece_18:
        with BuildLine():
            CenterArc((4.276016233, 6.332200859), FILLET4_R, 205.690778373, 60.018288102)
            ThreePointArc((-1.446265986, 3.579386625), (-0.665491896, 1.812983436), (0, 0))
            ThreePointArc((0, 0), (1.900451659, 0.071196564), (3.800903318, 0))
        make_face()
    extrude(amount=6.35)
    with BuildSketch(Plane(origin=(123.345875833, 162.941, 0), x_dir=(0.40481239471716945, 0.9143997621846535, 0), z_dir=(0, 0, -1))) as fillet4_piece_19:
        with BuildLine():
            CenterArc((FILLET4_R * 0.650905249429, -FILLET4_R), FILLET4_R, 90, 66.120628636)
            Line((-FILLET4_R * 0.263494512755, -FILLET4_R * 0.595187605283), (0, 0))
            Line((0, 0), (FILLET4_R * 0.650905249429, 0))
        make_face()
    extrude(amount=6.35)
    with BuildSketch(Plane(origin=(103.289496024, 162.941, 0), x_dir=(1, 0, 0), z_dir=(0, 0, -1))) as fillet4_piece_20:
        with BuildLine():
            CenterArc((FILLET4_R * 1.19601439217, -FILLET4_R), FILLET4_R, 90, 100.201311261)
            Line((FILLET4_R * 0.211822837185, -FILLET4_R * 1.1771072644), (0, 0))
            Line((0, 0), (FILLET4_R * 1.19601439217, 0))
        make_face()
    extrude(amount=6.35)
    with BuildSketch(Plane(origin=(195.852068159, 170.6999682, 0), x_dir=(-0.3573786281281809, -0.9339595902164181, 0), z_dir=(0, 0, -1))) as fillet4_piece_21:
        with BuildLine():
            CenterArc((FILLET4_R * 1.8158181583, FILLET4_R), FILLET4_R, 147.684555341, 122.315444659)
            Line((FILLET4_R * 0.970700395887, FILLET4_R * 1.53458017889), (0, 0))
            Line((0, 0), (FILLET4_R * 1.8158181583, 0))
        make_face()
    extrude(amount=6.35)
    with BuildSketch(Plane(origin=(175.810504033, 118.324113728, 0), x_dir=(0.35737862812818266, 0.9339595902164173, 0), z_dir=(0, 0, -1))) as fillet4_piece_22:
        with BuildLine():
            CenterArc((FILLET4_R * 1.46265296801, -FILLET4_R), FILLET4_R, 90, 111.280013)
            Line((FILLET4_R * 0.530835080934, -FILLET4_R * 1.36292619818), (0, 0))
            Line((0, 0), (FILLET4_R * 1.46265296801, 0))
        make_face()
    extrude(amount=6.35)
    with BuildSketch(Plane(origin=(132.201317489, 157.89329691, 0), x_dir=(0.7405781851536982, -0.6719702014780528, 0), z_dir=(0, 0, -1))) as fillet4_piece_23:
        with BuildLine():
            CenterArc((FILLET4_R * 1.97985852234, -FILLET4_R), FILLET4_R, 90, 126.404542341)
            Line((FILLET4_R * 1.17501177306, -FILLET4_R * 1.59348269576), (0, 0))
            Line((0, 0), (FILLET4_R * 1.97985852234, 0))
        make_face()
    extrude(amount=6.35)
    with BuildSketch(Plane(origin=(277.409295847, 160.596691482, 0), x_dir=(-0.4606177727337913, -0.8875985958989354, 0), z_dir=(0, 0, -1))) as fillet4_piece_24:
        with BuildLine():
            CenterArc((16.965462145, 6.35), FILLET4_R, 147.444724208, 122.555275792)
            ThreePointArc((11.613220522, 9.767017648), (6.553020907, 3.99600849), (0, 0))
            Line((0, 0), (16.965462145, 0))
        make_face()
    extrude(amount=6.35)
    with BuildSketch(Plane(origin=(254.218372429, 115.908378783, 0), x_dir=(0.4606177727337955, 0.8875985958989331, 0), z_dir=(0, 0, -1))) as fillet4_piece_25:
        with BuildLine():
            CenterArc((FILLET4_R * 1.50409098811, -FILLET4_R), FILLET4_R, 90, 112.763836941)
            Line((FILLET4_R * 0.581983434092, -FILLET4_R * 1.38693366206), (0, 0))
            Line((0, 0), (FILLET4_R * 1.50409098811, 0))
        make_face()
    extrude(amount=6.35)
    with BuildSketch(Plane(origin=(207.216268027, 172.303671647, 0), x_dir=(0.6402328485983261, -0.7681809028970148, 0), z_dir=(0, 0, -1))) as fillet4_piece_26:
        with BuildLine():
            CenterArc((FILLET4_R * 1.9183652575, -FILLET4_R), FILLET4_R, 90, 124.935995343)
            Line((FILLET4_R * 1.0985729868, -FILLET4_R * 1.57266101047), (0, 0))
            Line((0, 0), (FILLET4_R * 1.9183652575, 0))
        make_face()
    extrude(amount=6.35)
    with BuildSketch(Plane(origin=(241.81663743, 257.642066667, 0), x_dir=(-0.9113002737803683, -0.4117424085612579, 0), z_dir=(0, 0, -1))) as fillet4_piece_27:
        with BuildLine():
            CenterArc((FILLET4_R * 2.8576598332, -FILLET4_R), FILLET4_R, 90, 141.426371583)
            Line((FILLET4_R * 2.23414001373, -FILLET4_R * 1.78180754328), (0, 0))
            Line((0, 0), (FILLET4_R * 2.8576598332, 0))
        make_face()
    extrude(amount=6.35)
    with BuildSketch(Plane(origin=(211.56702527, 201.998771417, 0), x_dir=(0.7323899755840605, 0.6808853968649786, 0), z_dir=(0, 0, -1))) as fillet4_piece_28:
        with BuildLine():
            CenterArc((4.02645088, -6.142355487), FILLET4_R, 104.692699836, 48.716051847)
            Line((-1.651862755, -3.299952584), (0, 0))
            ThreePointArc((0, 0), (1.207935264, -0.155733385), (2.415870528, 0))
        make_face()
    extrude(amount=6.35)
    with BuildSketch(Plane(origin=(214.380001095, 204.053936148, 0), x_dir=(-0.9185032326241558, -0.3954134692432415, 0), z_dir=(0, 0, -1))) as fillet4_piece_29:
        with BuildLine():
            CenterArc((2.372088188, 6.278710984), FILLET4_R, 230.403797881, 31.002719134)
            Line((-1.675229819, 1.385683603), (0, 0))
            ThreePointArc((0, 0), (0.711626456, 0.053466762), (1.423252913, 0))
        make_face()
    extrude(amount=6.35)


solid = part.part
